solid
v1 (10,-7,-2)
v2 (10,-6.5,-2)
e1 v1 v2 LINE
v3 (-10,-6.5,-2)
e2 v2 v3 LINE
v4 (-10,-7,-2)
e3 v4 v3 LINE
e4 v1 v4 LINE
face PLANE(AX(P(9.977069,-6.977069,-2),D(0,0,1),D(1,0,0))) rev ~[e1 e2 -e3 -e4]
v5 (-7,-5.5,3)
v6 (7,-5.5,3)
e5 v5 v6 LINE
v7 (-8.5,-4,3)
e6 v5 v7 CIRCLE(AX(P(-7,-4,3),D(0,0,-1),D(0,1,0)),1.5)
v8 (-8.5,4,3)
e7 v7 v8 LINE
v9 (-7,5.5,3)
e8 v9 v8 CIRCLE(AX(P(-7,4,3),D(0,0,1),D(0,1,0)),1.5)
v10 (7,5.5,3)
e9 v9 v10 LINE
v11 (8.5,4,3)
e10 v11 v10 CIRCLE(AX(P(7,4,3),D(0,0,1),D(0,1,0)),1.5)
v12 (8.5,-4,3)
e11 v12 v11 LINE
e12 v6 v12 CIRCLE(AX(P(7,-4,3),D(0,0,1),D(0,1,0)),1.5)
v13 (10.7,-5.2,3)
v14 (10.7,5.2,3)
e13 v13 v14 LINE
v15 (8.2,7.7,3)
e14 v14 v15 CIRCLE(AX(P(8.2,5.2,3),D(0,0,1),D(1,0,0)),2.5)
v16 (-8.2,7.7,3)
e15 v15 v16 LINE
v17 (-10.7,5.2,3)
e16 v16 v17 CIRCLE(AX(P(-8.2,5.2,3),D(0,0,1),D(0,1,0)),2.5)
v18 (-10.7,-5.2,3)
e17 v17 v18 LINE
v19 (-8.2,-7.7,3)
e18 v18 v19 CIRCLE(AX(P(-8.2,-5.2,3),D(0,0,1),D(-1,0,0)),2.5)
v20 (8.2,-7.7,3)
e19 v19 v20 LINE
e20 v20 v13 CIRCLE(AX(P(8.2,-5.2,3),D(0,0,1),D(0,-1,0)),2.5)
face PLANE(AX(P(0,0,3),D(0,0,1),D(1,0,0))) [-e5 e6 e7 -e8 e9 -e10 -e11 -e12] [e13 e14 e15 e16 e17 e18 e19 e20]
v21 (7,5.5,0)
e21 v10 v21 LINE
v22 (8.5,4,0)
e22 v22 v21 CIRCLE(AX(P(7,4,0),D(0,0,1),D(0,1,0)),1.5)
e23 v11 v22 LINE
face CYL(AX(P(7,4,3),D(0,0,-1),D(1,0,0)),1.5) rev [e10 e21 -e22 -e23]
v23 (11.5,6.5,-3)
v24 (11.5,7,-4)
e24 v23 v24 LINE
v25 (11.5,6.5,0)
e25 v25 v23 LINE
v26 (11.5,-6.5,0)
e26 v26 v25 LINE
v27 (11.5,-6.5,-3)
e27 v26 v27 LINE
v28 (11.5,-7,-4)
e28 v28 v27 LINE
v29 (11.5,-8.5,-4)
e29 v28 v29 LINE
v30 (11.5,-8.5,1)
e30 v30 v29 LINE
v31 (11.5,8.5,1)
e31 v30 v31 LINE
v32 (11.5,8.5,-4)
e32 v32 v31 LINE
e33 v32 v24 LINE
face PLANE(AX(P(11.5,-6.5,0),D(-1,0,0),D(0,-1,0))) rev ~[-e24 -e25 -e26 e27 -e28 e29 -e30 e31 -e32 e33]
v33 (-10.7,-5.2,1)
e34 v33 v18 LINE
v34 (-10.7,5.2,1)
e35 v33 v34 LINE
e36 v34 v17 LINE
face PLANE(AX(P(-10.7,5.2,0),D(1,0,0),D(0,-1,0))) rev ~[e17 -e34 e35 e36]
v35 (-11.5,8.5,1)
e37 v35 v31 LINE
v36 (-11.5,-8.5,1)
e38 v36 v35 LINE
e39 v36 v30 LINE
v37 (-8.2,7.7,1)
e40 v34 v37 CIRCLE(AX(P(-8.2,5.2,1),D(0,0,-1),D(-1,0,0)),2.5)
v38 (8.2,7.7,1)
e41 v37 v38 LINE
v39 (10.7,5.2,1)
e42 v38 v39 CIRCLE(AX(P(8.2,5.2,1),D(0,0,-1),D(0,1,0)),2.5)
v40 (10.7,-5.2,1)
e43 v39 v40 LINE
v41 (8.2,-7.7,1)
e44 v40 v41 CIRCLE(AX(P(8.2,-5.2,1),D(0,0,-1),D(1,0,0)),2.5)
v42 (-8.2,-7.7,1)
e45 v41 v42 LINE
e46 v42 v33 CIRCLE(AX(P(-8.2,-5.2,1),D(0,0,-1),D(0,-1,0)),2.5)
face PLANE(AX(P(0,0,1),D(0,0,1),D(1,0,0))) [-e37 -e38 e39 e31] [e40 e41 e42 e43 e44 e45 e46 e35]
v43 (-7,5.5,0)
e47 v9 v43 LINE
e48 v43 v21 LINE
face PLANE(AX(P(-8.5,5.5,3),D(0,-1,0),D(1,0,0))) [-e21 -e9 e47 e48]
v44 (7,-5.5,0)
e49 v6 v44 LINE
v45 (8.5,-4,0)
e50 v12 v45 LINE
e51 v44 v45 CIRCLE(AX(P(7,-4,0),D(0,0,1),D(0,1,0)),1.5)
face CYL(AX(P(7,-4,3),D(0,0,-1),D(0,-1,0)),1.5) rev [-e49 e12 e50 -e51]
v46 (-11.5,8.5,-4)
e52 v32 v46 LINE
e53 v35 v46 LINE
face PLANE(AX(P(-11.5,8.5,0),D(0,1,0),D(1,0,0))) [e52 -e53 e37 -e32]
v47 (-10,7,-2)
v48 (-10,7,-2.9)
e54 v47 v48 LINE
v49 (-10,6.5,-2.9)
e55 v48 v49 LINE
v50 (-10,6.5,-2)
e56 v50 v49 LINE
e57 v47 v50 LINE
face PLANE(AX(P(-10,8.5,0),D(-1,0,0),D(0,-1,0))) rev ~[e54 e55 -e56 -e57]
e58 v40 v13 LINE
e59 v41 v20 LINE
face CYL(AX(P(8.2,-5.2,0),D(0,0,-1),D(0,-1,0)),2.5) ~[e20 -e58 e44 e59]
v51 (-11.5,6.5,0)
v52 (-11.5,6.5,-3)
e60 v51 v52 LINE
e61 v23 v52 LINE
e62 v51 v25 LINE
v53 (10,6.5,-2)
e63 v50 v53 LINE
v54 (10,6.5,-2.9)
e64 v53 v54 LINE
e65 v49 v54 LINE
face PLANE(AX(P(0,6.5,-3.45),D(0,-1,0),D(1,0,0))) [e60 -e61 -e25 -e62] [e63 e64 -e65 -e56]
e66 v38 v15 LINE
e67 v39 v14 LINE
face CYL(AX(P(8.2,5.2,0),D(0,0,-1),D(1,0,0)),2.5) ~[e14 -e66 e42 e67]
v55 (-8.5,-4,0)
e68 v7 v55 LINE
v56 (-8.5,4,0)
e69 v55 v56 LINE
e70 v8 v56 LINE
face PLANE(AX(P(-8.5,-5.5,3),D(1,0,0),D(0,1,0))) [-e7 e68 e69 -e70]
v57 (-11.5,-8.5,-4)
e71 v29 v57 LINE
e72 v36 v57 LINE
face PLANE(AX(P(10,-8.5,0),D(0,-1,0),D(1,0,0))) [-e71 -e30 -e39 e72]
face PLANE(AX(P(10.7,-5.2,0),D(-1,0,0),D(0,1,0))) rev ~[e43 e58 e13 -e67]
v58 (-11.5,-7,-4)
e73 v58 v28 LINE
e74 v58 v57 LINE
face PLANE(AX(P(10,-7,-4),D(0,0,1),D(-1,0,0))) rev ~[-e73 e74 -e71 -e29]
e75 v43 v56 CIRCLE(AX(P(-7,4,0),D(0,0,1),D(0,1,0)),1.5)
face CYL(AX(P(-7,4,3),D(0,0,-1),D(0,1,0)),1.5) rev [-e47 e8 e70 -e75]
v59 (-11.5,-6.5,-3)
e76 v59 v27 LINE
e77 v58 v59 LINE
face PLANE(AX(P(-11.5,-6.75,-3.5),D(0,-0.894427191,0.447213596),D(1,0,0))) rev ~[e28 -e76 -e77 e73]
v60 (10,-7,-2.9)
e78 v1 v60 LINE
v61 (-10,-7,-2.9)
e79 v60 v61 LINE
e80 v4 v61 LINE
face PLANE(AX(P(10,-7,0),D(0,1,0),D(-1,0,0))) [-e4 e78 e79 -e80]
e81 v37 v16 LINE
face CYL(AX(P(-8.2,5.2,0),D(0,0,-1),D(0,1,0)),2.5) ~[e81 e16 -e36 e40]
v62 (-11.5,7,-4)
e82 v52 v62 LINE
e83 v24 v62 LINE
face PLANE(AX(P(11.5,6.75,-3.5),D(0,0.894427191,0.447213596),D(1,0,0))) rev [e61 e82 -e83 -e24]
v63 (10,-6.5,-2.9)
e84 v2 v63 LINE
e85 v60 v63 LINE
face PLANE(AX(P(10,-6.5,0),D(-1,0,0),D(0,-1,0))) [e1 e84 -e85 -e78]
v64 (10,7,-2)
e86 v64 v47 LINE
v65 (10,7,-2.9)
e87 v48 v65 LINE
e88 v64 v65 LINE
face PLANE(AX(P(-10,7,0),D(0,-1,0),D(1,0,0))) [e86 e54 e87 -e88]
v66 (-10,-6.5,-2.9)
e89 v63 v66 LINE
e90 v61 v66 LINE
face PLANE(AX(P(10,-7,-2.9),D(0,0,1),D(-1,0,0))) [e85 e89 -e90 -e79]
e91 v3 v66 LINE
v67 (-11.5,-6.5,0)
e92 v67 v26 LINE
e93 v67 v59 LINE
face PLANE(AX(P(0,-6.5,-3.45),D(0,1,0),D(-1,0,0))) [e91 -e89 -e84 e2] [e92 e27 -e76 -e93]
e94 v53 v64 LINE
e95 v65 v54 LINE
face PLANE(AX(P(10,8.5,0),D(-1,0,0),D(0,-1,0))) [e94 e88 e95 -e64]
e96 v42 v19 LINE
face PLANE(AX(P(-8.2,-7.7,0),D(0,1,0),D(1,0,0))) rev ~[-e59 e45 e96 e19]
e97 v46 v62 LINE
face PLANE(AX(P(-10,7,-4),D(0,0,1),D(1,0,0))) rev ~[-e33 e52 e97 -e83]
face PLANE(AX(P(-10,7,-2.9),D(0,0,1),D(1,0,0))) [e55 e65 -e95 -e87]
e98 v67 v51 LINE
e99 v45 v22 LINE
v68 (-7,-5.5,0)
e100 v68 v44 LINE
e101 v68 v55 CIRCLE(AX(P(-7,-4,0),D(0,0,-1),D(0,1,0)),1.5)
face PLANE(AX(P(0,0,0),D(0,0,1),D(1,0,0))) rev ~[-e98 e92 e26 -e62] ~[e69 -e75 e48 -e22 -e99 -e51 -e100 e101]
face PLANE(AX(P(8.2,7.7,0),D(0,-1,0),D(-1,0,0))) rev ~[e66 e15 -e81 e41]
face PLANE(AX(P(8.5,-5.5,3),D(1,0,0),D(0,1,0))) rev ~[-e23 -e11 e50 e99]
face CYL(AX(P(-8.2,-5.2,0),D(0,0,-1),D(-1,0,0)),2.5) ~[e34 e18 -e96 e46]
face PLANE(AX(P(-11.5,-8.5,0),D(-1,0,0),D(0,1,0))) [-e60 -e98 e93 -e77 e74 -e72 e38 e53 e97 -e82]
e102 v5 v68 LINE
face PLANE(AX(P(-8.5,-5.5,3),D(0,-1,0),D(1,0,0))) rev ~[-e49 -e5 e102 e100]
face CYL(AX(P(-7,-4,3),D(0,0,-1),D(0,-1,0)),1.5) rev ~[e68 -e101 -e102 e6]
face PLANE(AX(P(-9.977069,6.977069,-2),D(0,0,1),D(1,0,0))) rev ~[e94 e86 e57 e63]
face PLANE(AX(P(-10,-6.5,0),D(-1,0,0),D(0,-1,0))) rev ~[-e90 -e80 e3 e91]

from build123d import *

# Parameters (mm, degrees)
F0_W         = 23
F0_H         = 17
F1_DEPTH     = 1
F2_DEPTH     = 3
F4_DEPTH     = 4
F5_DEPTH     = 2
F6_DEPTH     = 2
F7_W         = 1.5
F7_H         = 2
F8_DEPTH     = 4
F9_W         = 20
F9_H         = 1.1
F10_DEPTH    = 0.5
F11_W        = 20
F11_H        = 1.1
F12_DEPTH    = 0.5
F13_C1_SIZE2 = 1
F13_C1_SIZE  = 0.5
F13_C2_SIZE2 = 0.5
F13_C2_SIZE  = 1
F15_W        = 17
F15_H        = 11
F16_DEPTH    = 25
F17_R        = 1.5


# Not quite as in the source:
# - two fillets or chamfers of one size are made in one step


with BuildPart() as f1:
    # F0 (on Top) → F1 (new body)
    with BuildSketch(Plane.XY):
        Rectangle(F0_W, F0_H)
        with BuildLine():
            Line((-8.2, 7.7), (8.2, 7.7))
            ThreePointArc((8.2, 7.7), (9.967766953, 6.967766953), (10.7, 5.2))
            Line((10.7, 5.2), (10.7, -5.2))
            ThreePointArc((10.7, -5.2), (9.967766953, -6.967766953), (8.2, -7.7))
            Line((8.2, -7.7), (-8.2, -7.7))
            ThreePointArc((-8.2, -7.7), (-9.967766953, -6.967766953), (-10.7, -5.2))
            Line((-10.7, -5.2), (-10.7, 5.2))
            ThreePointArc((-10.7, 5.2), (-9.967766953, 6.967766953), (-8.2, 7.7))
        make_face(mode=Mode.SUBTRACT)
    extrude(amount=F1_DEPTH)

    # F0 (on Top) → F2 (join)
    with BuildSketch(Plane.XY):
        with BuildLine():
            ThreePointArc((10.7, 5.2), (9.967766953, 6.967766953), (8.2, 7.7))
            Line((8.2, 7.7), (-8.2, 7.7))
            ThreePointArc((-8.2, 7.7), (-9.967766953, 6.967766953), (-10.7, 5.2))
            Line((-10.7, 5.2), (-10.7, -5.2))
            ThreePointArc((-10.7, -5.2), (-9.967766953, -6.967766953), (-8.2, -7.7))
            Line((-8.2, -7.7), (8.2, -7.7))
            ThreePointArc((8.2, -7.7), (9.967766953, -6.967766953), (10.7, -5.2))
            Line((10.7, -5.2), (10.7, 5.2))
        make_face()
    extrude(amount=F2_DEPTH)

    # F3 (on face) → F4 (join)
    with BuildSketch(Plane.XY):
        with BuildLine():
            Line((10, -8.5), (10, -7))
            Line((10, -7), (9.9349351573, -7))
            ThreePointArc((9.9349351573, -7), (9.1354143467, -7.5184046239), (8.2, -7.7))
            Line((8.2, -7.7), (-8.2, -7.7))
            ThreePointArc((-8.2, -7.7), (-9.1354143467, -7.5184046239), (-9.9349351573, -7))
            Line((-9.9349351573, -7), (-10, -7))
            Line((-10, -7), (-10, -8.5))
            Line((-10, -8.5), (10, -8.5))
        make_face()
        with BuildLine():
            ThreePointArc((8.2, -7.7), (9.1354143467, -7.5184046239), (9.9349351573, -7))
            Line((9.9349351573, -7), (-9.9349351573, -7))
            ThreePointArc((-9.9349351573, -7), (-9.1354143467, -7.5184046239), (-8.2, -7.7))
            Line((-8.2, -7.7), (8.2, -7.7))
        make_face()
        with BuildLine():
            Line((9.9349351573, 7), (10, 7))
            Line((10, 7), (10, 8.5))
            Line((10, 8.5), (-10, 8.5))
            Line((-10, 8.5), (-10, 7))
            Line((-10, 7), (-9.9349351573, 7))
            ThreePointArc((-9.9349351573, 7), (-9.1354143467, 7.5184046239), (-8.2, 7.7))
            Line((-8.2, 7.7), (8.2, 7.7))
            ThreePointArc((8.2, 7.7), (9.1354143467, 7.5184046239), (9.9349351573, 7))
        make_face()
        with BuildLine():
            Line((-9.9349351573, 7), (9.9349351573, 7))
            ThreePointArc((9.9349351573, 7), (9.1354143467, 7.5184046239), (8.2, 7.7))
            Line((8.2, 7.7), (-8.2, 7.7))
            ThreePointArc((-8.2, 7.7), (-9.1354143467, 7.5184046239), (-9.9349351573, 7))
        make_face()
    extrude(amount=-F4_DEPTH)

    # F3 (on face) → F5 (join)
    with BuildSketch(Plane.XY):
        with BuildLine():
            Line((-9.9349351573, -7), (9.9349351573, -7))
            ThreePointArc((9.9349351573, -7), (9.967766953, -6.967766953), (10, -6.9349351573))
            Line((10, -6.9349351573), (10, -6.5))
            Line((10, -6.5), (-10, -6.5))
            Line((-10, -6.5), (-10, -6.9349351573))
            ThreePointArc((-10, -6.9349351573), (-9.967766953, -6.967766953), (-9.9349351573, -7))
        make_face()
        with BuildLine():
            Line((10, 6.5), (10, 6.9349351573))
            ThreePointArc((10, 6.9349351573), (9.967766953, 6.967766953), (9.9349351573, 7))
            Line((9.9349351573, 7), (-9.9349351573, 7))
            ThreePointArc((-9.9349351573, 7), (-9.967766953, 6.967766953), (-10, 6.9349351573))
            Line((-10, 6.9349351573), (-10, 6.5))
            Line((-10, 6.5), (10, 6.5))
        make_face()
    extrude(amount=-F5_DEPTH)

    # F3 (on face) → F6 (join)
    with BuildSketch(Plane.XY):
        with BuildLine():
            Line((9.9349351573, -7), (10, -7))
            Line((10, -7), (10, -6.9349351573))
            ThreePointArc((10, -6.9349351573), (9.967766953, -6.967766953), (9.9349351573, -7))
        make_face()
        with BuildLine():
            Line((-10, -7), (-9.9349351573, -7))
            ThreePointArc((-9.9349351573, -7), (-9.967766953, -6.967766953), (-10, -6.9349351573))
            Line((-10, -6.9349351573), (-10, -7))
        make_face()
        with BuildLine():
            ThreePointArc((9.9349351573, 7), (9.967766953, 6.967766953), (10, 6.9349351573))
            Line((10, 6.9349351573), (10, 7))
            Line((10, 7), (9.9349351573, 7))
        make_face()
        with BuildLine():
            Line((-10, 7), (-10, 6.9349351573))
            ThreePointArc((-10, 6.9349351573), (-9.967766953, 6.967766953), (-9.9349351573, 7))
            Line((-9.9349351573, 7), (-10, 7))
        make_face()
    extrude(amount=-F6_DEPTH)

    # F7 (on face) → F8 (join)
    with BuildSketch(Plane(origin=(0, 0, 0), x_dir=(1, 0, 0), z_dir=(0, 0, -1))):
        with Locations((10.75, 7.5)):
            Rectangle(F7_W, F7_H)
        with Locations((-10.75, 7.5)):
            Rectangle(F7_W, F7_H)
        with Locations((-10.75, -7.5)):
            Rectangle(F7_W, F7_H)
        with Locations((10.75, -7.5)):
            Rectangle(F7_W, F7_H)
    extrude(amount=F8_DEPTH)

    # F9 (on face) → F10 (join)
    with BuildSketch(Plane(origin=(0, -7, 0), x_dir=(-1, 0, 0), z_dir=(0, 1, 0))):
        with Locations((0, -3.45)):
            Rectangle(F9_W, F9_H)
    extrude(amount=F10_DEPTH)

    # F11 (on face) → F12 (join)
    with BuildSketch(Plane.XZ.offset(-7)):
        with Locations((0, -3.45)):
            Rectangle(F11_W, F11_H)
    extrude(amount=F12_DEPTH)

    # F13: chamfer of 0.5 x 1 on 2 edges, made by hand

    # F13_c1
    f13_c1_edges = [f1.edges().sort_by_distance(p)[0] for p in [
        (0, -6.5, -4),
    ]]
    f13_c1_side = f1.faces().sort_by_distance((0, -6.51, -4))[0]
    chamfer(f13_c1_edges, length=F13_C1_SIZE, length2=F13_C1_SIZE2, reference=f13_c1_side)

    # F13_c2
    f13_c2_edges = [f1.edges().sort_by_distance(p)[0] for p in [
        (0, 6.5, -4),
    ]]
    f13_c2_side = f1.faces().sort_by_distance((0, 6.5, -3.99))[0]
    chamfer(f13_c2_edges, length=F13_C2_SIZE, length2=F13_C2_SIZE2, reference=f13_c2_side)

    # F15 (on face) → F16 (cut)
    with BuildSketch(Plane.XY.offset(3)):
        Rectangle(F15_W, F15_H)
    extrude(amount=-F16_DEPTH, mode=Mode.SUBTRACT)

    # F17
    f17_edges = [f1.edges().sort_by_distance(p)[0] for p in [
        (-8.5, -5.5, 1.5),
        (-8.5, 5.5, 1.5),
        (8.5, 5.5, 1.5),
        (8.5, -5.5, 1.5),
    ]]
    fillet(f17_edges, radius=F17_R)


solid = f1.part
